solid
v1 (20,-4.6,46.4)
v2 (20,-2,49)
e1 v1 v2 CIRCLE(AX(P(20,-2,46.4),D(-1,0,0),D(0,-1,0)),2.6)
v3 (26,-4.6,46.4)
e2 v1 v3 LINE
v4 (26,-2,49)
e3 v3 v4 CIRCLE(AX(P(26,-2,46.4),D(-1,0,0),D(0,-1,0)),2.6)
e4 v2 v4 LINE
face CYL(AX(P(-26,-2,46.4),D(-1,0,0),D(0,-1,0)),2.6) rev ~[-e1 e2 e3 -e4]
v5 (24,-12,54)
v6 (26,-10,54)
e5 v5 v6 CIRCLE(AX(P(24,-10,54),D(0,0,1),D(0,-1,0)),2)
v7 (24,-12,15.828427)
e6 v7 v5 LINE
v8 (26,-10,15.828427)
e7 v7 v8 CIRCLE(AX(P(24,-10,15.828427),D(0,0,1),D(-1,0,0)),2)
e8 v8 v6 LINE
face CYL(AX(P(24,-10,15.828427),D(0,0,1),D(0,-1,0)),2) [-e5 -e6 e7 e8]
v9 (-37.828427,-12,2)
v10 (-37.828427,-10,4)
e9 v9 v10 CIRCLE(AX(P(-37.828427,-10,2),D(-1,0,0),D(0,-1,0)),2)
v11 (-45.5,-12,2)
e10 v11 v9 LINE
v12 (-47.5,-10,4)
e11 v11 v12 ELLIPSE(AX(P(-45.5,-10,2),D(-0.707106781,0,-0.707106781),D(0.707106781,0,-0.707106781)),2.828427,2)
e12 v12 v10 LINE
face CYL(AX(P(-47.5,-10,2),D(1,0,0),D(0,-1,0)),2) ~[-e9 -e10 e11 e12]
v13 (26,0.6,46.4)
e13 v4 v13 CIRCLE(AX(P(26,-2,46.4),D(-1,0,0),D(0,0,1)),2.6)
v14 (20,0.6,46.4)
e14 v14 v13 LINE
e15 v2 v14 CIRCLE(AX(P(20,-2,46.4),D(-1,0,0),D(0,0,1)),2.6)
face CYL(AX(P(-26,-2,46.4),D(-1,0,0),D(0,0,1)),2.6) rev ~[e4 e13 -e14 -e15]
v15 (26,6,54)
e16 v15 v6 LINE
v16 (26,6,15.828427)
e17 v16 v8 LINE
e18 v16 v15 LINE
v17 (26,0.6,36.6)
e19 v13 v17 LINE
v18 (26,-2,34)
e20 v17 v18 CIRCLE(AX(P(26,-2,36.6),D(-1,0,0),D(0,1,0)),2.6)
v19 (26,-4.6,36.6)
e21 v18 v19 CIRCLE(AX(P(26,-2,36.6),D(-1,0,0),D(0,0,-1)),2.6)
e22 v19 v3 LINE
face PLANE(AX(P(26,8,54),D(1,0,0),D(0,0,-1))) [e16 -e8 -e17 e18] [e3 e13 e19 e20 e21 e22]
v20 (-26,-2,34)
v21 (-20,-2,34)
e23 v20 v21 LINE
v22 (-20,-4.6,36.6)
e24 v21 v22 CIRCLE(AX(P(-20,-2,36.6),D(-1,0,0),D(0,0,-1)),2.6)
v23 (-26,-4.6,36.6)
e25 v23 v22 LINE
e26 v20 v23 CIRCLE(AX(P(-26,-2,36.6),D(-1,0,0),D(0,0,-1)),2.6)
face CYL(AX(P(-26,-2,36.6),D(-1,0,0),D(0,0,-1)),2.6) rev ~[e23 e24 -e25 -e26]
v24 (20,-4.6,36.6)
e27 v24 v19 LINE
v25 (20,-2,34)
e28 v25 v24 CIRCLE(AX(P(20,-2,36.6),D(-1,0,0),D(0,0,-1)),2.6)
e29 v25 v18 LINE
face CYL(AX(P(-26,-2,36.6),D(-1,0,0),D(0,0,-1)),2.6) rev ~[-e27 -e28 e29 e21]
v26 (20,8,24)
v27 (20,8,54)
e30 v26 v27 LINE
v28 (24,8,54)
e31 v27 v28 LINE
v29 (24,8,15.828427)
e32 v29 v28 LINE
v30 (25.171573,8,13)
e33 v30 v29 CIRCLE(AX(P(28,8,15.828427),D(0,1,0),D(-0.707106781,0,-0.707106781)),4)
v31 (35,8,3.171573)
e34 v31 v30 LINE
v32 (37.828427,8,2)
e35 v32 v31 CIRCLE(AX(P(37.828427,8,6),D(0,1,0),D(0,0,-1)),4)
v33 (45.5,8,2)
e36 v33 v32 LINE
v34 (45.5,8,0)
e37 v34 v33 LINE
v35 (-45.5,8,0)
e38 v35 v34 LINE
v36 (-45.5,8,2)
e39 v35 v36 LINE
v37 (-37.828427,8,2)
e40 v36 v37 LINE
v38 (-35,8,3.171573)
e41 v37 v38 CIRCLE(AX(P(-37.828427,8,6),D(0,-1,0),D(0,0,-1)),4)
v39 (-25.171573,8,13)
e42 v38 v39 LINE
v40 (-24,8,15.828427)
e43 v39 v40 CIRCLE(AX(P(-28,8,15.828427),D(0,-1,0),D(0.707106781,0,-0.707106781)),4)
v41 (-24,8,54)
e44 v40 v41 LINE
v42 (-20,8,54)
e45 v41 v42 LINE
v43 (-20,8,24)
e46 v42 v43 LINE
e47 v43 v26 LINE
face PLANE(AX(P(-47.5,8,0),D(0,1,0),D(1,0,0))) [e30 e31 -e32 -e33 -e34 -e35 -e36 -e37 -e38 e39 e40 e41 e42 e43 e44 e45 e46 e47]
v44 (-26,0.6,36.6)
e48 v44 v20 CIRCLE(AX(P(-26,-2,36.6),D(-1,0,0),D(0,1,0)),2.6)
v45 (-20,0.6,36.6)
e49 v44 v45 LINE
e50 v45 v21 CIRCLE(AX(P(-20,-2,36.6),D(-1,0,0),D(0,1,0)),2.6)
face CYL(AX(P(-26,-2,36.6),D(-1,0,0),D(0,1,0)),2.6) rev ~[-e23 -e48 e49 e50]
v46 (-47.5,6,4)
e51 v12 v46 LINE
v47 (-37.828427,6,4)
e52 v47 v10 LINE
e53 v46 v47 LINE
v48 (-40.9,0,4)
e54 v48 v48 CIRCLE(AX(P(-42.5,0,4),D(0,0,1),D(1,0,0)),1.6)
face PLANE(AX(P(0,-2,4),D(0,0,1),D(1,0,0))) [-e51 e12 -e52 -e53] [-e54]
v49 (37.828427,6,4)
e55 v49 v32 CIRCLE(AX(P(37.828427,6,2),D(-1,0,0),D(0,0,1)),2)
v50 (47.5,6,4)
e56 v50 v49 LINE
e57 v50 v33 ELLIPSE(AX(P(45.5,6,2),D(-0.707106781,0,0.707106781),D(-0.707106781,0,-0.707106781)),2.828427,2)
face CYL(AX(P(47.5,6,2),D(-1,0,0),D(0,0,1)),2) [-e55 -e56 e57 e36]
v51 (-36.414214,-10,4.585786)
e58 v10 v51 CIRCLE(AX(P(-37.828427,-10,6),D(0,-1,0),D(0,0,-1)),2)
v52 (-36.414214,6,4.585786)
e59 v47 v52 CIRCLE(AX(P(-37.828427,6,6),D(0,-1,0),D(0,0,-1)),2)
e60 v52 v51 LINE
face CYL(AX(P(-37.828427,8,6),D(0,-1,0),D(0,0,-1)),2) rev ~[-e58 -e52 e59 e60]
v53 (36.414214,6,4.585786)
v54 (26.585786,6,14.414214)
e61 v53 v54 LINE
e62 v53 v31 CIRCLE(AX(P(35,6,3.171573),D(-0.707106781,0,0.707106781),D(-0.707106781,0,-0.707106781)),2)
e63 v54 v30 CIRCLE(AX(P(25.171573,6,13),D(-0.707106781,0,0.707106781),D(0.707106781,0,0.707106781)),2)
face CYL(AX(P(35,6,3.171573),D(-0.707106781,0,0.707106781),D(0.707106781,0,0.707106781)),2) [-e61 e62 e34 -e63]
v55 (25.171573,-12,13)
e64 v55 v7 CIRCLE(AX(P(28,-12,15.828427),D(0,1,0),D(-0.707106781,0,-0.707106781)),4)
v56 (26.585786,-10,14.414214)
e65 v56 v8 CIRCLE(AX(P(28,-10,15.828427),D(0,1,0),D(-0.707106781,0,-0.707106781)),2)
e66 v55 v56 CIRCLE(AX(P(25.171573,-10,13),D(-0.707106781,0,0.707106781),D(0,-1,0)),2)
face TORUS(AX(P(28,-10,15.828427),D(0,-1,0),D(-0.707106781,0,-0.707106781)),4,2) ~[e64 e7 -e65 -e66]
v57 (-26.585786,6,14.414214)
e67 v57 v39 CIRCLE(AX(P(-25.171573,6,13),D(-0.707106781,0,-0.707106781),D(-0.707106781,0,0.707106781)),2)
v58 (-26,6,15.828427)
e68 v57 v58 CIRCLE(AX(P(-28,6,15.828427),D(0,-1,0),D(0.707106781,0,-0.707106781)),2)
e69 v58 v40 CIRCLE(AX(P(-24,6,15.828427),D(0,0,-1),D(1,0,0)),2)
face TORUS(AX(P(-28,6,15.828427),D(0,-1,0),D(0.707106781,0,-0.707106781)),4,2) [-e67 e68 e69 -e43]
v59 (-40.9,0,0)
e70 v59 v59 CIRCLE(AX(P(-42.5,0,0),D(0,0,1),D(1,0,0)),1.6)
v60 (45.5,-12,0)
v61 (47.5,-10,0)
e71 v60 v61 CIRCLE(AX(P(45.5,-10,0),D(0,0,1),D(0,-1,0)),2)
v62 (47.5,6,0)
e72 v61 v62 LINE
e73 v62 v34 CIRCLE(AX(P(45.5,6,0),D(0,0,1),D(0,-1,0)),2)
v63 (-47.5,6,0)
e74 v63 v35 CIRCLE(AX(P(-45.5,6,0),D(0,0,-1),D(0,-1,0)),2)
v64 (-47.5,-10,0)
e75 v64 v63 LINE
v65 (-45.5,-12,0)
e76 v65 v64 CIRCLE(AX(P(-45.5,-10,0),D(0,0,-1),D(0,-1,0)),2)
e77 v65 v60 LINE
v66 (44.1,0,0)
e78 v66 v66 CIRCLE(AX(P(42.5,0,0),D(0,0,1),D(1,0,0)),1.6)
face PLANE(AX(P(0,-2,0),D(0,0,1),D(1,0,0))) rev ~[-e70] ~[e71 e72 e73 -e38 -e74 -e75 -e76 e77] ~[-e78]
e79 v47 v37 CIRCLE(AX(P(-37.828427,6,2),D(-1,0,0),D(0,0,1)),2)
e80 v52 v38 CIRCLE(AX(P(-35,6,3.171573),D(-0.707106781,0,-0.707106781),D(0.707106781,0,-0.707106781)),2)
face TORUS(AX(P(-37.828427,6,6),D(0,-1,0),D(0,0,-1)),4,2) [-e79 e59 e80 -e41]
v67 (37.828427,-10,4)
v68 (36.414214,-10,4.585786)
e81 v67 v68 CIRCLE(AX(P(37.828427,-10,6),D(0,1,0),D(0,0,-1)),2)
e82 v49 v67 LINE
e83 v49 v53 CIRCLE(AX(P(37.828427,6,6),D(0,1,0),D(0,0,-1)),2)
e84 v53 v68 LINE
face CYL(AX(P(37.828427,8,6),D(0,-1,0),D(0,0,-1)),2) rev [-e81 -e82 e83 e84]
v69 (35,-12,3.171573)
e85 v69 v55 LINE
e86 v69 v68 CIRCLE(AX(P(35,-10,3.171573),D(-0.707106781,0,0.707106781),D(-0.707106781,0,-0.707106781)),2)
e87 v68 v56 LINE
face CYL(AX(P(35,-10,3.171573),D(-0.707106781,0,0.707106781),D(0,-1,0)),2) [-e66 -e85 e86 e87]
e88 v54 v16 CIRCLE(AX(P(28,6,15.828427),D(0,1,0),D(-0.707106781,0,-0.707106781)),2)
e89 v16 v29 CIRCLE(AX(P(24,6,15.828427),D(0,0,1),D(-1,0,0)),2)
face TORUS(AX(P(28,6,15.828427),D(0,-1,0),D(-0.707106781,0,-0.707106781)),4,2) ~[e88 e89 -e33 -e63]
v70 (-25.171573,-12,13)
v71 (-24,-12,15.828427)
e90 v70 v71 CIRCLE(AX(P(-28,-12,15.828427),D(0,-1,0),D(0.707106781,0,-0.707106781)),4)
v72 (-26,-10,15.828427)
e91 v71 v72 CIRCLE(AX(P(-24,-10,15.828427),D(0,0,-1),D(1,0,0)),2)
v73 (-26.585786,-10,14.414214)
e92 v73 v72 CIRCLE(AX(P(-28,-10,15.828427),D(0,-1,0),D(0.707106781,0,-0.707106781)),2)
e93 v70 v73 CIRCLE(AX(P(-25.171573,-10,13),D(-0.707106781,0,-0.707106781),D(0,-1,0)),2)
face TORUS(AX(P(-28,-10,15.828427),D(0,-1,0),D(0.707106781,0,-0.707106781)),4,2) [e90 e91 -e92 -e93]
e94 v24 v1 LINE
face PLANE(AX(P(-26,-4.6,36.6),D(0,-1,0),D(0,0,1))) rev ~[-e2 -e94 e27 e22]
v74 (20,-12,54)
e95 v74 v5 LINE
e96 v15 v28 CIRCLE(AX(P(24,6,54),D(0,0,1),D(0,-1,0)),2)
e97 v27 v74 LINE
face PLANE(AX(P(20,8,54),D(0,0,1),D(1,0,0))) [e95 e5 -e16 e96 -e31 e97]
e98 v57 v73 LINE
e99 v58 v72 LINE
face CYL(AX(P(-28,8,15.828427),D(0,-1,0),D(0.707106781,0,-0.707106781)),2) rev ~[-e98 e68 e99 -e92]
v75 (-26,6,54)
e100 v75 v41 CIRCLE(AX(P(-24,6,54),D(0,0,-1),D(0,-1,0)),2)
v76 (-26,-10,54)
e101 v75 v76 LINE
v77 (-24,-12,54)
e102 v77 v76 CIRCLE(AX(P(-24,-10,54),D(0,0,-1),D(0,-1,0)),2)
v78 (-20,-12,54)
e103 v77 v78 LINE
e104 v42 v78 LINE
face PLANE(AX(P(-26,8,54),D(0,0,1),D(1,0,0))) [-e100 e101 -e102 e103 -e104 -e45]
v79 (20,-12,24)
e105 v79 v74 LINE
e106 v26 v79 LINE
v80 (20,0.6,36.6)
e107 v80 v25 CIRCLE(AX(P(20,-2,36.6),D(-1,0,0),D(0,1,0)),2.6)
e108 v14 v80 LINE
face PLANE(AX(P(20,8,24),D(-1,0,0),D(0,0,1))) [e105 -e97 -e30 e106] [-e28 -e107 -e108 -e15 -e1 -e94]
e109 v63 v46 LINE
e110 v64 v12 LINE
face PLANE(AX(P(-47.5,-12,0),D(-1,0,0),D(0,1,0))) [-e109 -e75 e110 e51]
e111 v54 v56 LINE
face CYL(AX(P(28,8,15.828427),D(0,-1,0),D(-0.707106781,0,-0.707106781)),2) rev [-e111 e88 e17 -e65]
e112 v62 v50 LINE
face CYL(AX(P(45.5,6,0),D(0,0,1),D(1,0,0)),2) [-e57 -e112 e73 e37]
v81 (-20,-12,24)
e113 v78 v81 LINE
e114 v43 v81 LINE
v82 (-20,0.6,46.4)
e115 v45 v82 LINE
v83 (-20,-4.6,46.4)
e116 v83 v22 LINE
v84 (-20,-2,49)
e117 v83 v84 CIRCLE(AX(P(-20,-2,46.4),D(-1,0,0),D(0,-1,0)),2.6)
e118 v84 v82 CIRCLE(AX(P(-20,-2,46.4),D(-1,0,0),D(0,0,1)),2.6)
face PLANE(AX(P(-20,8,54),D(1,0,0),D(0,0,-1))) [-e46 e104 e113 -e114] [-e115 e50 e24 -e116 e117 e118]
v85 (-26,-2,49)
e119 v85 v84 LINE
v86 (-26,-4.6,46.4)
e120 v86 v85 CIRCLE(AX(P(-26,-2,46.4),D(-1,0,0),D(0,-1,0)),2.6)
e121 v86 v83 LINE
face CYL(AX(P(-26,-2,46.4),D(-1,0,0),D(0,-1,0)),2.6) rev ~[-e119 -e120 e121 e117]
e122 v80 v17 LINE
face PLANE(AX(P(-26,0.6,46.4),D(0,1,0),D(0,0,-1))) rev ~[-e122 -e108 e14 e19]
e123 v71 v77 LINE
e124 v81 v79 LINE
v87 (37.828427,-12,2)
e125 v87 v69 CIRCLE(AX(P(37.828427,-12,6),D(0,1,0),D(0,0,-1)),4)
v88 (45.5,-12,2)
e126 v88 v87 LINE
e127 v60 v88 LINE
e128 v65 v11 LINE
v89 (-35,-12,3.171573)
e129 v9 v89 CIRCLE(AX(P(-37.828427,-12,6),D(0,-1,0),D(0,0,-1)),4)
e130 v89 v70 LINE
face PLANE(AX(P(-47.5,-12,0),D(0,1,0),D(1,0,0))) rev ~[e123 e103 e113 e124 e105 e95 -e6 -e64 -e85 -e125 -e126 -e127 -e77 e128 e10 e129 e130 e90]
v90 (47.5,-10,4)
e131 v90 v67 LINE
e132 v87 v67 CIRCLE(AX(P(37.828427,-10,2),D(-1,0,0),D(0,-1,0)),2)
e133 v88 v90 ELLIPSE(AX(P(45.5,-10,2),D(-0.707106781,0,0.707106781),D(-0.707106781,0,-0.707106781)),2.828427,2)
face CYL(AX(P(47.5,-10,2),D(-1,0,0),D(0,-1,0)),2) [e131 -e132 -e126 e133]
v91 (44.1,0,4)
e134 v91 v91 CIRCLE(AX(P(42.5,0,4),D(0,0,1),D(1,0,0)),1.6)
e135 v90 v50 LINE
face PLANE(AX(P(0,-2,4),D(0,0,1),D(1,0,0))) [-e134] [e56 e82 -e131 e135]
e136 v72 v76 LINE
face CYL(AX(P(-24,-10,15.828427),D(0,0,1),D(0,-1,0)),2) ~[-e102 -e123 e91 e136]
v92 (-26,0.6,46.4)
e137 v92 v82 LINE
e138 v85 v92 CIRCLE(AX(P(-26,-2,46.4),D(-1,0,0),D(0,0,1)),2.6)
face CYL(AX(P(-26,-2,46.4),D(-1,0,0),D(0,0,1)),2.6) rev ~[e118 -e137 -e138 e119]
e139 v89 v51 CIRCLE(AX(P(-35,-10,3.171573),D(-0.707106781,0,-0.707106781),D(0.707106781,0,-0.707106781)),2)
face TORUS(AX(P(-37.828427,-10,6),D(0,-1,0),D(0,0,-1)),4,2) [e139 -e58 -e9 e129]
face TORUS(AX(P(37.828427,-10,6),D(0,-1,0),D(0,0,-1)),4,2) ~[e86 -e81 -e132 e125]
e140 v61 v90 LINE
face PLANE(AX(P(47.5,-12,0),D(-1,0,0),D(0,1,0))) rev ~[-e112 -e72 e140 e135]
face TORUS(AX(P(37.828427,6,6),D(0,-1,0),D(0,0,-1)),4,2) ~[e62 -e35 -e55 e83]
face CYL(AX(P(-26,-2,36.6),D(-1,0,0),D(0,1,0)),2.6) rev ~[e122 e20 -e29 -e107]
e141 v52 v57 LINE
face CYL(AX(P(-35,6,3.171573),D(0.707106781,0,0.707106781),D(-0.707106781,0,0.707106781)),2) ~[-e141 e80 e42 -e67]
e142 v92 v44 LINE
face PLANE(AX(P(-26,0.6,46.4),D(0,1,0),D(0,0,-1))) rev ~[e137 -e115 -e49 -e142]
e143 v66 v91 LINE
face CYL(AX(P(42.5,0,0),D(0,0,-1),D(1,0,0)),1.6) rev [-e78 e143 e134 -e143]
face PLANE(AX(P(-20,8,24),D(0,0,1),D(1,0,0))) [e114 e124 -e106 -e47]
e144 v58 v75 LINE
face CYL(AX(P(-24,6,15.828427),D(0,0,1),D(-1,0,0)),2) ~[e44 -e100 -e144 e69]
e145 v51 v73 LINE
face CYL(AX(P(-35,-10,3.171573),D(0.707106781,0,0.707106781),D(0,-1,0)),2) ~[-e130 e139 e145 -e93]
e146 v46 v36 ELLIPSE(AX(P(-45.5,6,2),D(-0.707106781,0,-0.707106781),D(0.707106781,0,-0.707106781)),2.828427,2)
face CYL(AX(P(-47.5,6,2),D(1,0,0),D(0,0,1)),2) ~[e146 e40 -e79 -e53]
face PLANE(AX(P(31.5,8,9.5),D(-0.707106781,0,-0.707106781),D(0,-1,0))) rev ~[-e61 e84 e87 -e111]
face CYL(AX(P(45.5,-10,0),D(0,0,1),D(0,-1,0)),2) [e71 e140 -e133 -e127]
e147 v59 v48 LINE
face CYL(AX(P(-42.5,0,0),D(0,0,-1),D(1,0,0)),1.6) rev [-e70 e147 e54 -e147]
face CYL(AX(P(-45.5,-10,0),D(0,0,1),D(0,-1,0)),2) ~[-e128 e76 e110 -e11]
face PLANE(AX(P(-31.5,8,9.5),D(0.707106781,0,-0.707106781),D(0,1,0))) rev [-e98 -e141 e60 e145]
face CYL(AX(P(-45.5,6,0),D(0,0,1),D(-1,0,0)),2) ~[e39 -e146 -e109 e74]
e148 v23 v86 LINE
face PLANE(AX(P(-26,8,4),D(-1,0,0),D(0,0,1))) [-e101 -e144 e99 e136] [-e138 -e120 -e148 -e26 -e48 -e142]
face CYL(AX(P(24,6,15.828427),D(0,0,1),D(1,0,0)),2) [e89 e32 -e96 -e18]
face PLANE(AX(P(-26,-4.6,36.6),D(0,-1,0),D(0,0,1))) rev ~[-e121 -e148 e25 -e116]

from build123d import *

# Parameters (mm, degrees)
F0_W     = 95
F0_H     = 20
F0_R     = 1.6
F1_DEPTH = 4
F3_DEPTH = 20
F4_SIZE  = 11
F6_DEPTH = 52
F7_F1_R  = 2
F7_F2_R  = 2


with BuildPart() as f1:
    # F0 (on Top) → F1 (new body)
    with BuildSketch(Plane.XY):
        with Locations((0, -2)):
            Rectangle(F0_W, F0_H)
        with Locations((-42.5, 0)):
            Circle(F0_R, mode=Mode.SUBTRACT)
        with Locations((42.5, 0)):
            Circle(F0_R, mode=Mode.SUBTRACT)
    extrude(amount=F1_DEPTH)

    # F2 (on face) → F3 (join, through all)
    with BuildSketch(Plane(origin=(0, 8, 0), x_dir=(-1, 0, 0), z_dir=(0, 1, 0))):
        Polygon((-26, 54), (-26, 4), (26, 4), (26, 54), (20, 54), (20, 24), (-20, 24), (-20, 54), align=None)
    extrude(amount=-F3_DEPTH)

    # F4
    f4_edges = [f1.edges().sort_by_distance(p)[0] for p in [
        (26, -2, 4),
        (-26, -2, 4),
    ]]
    chamfer(f4_edges, length=F4_SIZE)

    # F5 (on face) → F6 (cut, through all)
    with BuildSketch(Plane(origin=(-26, 0, 0), x_dir=(0, -1, 0), z_dir=(-1, 0, 0))):
        with BuildLine():
            ThreePointArc((2, 49), (0.1615223689, 48.2384776311), (-0.6, 46.4))
            Line((-0.6, 46.4), (-0.6, 36.6))
            ThreePointArc((-0.6, 36.6), (0.1615223689, 34.7615223689), (2, 34))
            ThreePointArc((2, 34), (3.8384776311, 34.7615223689), (4.6, 36.6))
            Line((4.6, 36.6), (4.6, 46.4))
            ThreePointArc((4.6, 46.4), (3.8384776311, 48.2384776311), (2, 49))
        make_face()
    extrude(amount=-F6_DEPTH, mode=Mode.SUBTRACT)

    # F7: fillet of radius 2 on 12 edges, made by hand

    # F7_f1
    f7_f1_edges = [f1.edges().sort_by_distance(p)[0] for p in [
        (37, -2, 4),
        (26, -2, 15),
        (-37, -2, 4),
        (-26, -2, 15),
    ]]
    fillet(f7_f1_edges, radius=F7_F1_R)

    # F7_f2
    f7_f2_edges = [f1.edges().sort_by_distance(p)[0] for p in [
        (31.5, 8, 9.5),
        (31.5, -12, 9.5),
        (-31.5, 8, 9.5),
        (-31.5, -12, 9.5),
        (-47.5, -12, 2),
        (-47.5, 8, 2),
        (47.5, -12, 2),
        (47.5, 8, 2),
        (-37.06306026, -12, 4.152240935),
        (-26.152240935, -12, 15.06306026),
        (-37.06306026, 8, 4.152240935),
        (-26.152240935, 8, 15.06306026),
        (37.06306026, -12, 4.152240935),
        (26.152240935, -12, 15.06306026),
        (37.06306026, 8, 4.152240935),
        (26.152240935, 8, 15.06306026),
    ]]
    fillet(f7_f2_edges, radius=F7_F2_R)


solid = f1.part
